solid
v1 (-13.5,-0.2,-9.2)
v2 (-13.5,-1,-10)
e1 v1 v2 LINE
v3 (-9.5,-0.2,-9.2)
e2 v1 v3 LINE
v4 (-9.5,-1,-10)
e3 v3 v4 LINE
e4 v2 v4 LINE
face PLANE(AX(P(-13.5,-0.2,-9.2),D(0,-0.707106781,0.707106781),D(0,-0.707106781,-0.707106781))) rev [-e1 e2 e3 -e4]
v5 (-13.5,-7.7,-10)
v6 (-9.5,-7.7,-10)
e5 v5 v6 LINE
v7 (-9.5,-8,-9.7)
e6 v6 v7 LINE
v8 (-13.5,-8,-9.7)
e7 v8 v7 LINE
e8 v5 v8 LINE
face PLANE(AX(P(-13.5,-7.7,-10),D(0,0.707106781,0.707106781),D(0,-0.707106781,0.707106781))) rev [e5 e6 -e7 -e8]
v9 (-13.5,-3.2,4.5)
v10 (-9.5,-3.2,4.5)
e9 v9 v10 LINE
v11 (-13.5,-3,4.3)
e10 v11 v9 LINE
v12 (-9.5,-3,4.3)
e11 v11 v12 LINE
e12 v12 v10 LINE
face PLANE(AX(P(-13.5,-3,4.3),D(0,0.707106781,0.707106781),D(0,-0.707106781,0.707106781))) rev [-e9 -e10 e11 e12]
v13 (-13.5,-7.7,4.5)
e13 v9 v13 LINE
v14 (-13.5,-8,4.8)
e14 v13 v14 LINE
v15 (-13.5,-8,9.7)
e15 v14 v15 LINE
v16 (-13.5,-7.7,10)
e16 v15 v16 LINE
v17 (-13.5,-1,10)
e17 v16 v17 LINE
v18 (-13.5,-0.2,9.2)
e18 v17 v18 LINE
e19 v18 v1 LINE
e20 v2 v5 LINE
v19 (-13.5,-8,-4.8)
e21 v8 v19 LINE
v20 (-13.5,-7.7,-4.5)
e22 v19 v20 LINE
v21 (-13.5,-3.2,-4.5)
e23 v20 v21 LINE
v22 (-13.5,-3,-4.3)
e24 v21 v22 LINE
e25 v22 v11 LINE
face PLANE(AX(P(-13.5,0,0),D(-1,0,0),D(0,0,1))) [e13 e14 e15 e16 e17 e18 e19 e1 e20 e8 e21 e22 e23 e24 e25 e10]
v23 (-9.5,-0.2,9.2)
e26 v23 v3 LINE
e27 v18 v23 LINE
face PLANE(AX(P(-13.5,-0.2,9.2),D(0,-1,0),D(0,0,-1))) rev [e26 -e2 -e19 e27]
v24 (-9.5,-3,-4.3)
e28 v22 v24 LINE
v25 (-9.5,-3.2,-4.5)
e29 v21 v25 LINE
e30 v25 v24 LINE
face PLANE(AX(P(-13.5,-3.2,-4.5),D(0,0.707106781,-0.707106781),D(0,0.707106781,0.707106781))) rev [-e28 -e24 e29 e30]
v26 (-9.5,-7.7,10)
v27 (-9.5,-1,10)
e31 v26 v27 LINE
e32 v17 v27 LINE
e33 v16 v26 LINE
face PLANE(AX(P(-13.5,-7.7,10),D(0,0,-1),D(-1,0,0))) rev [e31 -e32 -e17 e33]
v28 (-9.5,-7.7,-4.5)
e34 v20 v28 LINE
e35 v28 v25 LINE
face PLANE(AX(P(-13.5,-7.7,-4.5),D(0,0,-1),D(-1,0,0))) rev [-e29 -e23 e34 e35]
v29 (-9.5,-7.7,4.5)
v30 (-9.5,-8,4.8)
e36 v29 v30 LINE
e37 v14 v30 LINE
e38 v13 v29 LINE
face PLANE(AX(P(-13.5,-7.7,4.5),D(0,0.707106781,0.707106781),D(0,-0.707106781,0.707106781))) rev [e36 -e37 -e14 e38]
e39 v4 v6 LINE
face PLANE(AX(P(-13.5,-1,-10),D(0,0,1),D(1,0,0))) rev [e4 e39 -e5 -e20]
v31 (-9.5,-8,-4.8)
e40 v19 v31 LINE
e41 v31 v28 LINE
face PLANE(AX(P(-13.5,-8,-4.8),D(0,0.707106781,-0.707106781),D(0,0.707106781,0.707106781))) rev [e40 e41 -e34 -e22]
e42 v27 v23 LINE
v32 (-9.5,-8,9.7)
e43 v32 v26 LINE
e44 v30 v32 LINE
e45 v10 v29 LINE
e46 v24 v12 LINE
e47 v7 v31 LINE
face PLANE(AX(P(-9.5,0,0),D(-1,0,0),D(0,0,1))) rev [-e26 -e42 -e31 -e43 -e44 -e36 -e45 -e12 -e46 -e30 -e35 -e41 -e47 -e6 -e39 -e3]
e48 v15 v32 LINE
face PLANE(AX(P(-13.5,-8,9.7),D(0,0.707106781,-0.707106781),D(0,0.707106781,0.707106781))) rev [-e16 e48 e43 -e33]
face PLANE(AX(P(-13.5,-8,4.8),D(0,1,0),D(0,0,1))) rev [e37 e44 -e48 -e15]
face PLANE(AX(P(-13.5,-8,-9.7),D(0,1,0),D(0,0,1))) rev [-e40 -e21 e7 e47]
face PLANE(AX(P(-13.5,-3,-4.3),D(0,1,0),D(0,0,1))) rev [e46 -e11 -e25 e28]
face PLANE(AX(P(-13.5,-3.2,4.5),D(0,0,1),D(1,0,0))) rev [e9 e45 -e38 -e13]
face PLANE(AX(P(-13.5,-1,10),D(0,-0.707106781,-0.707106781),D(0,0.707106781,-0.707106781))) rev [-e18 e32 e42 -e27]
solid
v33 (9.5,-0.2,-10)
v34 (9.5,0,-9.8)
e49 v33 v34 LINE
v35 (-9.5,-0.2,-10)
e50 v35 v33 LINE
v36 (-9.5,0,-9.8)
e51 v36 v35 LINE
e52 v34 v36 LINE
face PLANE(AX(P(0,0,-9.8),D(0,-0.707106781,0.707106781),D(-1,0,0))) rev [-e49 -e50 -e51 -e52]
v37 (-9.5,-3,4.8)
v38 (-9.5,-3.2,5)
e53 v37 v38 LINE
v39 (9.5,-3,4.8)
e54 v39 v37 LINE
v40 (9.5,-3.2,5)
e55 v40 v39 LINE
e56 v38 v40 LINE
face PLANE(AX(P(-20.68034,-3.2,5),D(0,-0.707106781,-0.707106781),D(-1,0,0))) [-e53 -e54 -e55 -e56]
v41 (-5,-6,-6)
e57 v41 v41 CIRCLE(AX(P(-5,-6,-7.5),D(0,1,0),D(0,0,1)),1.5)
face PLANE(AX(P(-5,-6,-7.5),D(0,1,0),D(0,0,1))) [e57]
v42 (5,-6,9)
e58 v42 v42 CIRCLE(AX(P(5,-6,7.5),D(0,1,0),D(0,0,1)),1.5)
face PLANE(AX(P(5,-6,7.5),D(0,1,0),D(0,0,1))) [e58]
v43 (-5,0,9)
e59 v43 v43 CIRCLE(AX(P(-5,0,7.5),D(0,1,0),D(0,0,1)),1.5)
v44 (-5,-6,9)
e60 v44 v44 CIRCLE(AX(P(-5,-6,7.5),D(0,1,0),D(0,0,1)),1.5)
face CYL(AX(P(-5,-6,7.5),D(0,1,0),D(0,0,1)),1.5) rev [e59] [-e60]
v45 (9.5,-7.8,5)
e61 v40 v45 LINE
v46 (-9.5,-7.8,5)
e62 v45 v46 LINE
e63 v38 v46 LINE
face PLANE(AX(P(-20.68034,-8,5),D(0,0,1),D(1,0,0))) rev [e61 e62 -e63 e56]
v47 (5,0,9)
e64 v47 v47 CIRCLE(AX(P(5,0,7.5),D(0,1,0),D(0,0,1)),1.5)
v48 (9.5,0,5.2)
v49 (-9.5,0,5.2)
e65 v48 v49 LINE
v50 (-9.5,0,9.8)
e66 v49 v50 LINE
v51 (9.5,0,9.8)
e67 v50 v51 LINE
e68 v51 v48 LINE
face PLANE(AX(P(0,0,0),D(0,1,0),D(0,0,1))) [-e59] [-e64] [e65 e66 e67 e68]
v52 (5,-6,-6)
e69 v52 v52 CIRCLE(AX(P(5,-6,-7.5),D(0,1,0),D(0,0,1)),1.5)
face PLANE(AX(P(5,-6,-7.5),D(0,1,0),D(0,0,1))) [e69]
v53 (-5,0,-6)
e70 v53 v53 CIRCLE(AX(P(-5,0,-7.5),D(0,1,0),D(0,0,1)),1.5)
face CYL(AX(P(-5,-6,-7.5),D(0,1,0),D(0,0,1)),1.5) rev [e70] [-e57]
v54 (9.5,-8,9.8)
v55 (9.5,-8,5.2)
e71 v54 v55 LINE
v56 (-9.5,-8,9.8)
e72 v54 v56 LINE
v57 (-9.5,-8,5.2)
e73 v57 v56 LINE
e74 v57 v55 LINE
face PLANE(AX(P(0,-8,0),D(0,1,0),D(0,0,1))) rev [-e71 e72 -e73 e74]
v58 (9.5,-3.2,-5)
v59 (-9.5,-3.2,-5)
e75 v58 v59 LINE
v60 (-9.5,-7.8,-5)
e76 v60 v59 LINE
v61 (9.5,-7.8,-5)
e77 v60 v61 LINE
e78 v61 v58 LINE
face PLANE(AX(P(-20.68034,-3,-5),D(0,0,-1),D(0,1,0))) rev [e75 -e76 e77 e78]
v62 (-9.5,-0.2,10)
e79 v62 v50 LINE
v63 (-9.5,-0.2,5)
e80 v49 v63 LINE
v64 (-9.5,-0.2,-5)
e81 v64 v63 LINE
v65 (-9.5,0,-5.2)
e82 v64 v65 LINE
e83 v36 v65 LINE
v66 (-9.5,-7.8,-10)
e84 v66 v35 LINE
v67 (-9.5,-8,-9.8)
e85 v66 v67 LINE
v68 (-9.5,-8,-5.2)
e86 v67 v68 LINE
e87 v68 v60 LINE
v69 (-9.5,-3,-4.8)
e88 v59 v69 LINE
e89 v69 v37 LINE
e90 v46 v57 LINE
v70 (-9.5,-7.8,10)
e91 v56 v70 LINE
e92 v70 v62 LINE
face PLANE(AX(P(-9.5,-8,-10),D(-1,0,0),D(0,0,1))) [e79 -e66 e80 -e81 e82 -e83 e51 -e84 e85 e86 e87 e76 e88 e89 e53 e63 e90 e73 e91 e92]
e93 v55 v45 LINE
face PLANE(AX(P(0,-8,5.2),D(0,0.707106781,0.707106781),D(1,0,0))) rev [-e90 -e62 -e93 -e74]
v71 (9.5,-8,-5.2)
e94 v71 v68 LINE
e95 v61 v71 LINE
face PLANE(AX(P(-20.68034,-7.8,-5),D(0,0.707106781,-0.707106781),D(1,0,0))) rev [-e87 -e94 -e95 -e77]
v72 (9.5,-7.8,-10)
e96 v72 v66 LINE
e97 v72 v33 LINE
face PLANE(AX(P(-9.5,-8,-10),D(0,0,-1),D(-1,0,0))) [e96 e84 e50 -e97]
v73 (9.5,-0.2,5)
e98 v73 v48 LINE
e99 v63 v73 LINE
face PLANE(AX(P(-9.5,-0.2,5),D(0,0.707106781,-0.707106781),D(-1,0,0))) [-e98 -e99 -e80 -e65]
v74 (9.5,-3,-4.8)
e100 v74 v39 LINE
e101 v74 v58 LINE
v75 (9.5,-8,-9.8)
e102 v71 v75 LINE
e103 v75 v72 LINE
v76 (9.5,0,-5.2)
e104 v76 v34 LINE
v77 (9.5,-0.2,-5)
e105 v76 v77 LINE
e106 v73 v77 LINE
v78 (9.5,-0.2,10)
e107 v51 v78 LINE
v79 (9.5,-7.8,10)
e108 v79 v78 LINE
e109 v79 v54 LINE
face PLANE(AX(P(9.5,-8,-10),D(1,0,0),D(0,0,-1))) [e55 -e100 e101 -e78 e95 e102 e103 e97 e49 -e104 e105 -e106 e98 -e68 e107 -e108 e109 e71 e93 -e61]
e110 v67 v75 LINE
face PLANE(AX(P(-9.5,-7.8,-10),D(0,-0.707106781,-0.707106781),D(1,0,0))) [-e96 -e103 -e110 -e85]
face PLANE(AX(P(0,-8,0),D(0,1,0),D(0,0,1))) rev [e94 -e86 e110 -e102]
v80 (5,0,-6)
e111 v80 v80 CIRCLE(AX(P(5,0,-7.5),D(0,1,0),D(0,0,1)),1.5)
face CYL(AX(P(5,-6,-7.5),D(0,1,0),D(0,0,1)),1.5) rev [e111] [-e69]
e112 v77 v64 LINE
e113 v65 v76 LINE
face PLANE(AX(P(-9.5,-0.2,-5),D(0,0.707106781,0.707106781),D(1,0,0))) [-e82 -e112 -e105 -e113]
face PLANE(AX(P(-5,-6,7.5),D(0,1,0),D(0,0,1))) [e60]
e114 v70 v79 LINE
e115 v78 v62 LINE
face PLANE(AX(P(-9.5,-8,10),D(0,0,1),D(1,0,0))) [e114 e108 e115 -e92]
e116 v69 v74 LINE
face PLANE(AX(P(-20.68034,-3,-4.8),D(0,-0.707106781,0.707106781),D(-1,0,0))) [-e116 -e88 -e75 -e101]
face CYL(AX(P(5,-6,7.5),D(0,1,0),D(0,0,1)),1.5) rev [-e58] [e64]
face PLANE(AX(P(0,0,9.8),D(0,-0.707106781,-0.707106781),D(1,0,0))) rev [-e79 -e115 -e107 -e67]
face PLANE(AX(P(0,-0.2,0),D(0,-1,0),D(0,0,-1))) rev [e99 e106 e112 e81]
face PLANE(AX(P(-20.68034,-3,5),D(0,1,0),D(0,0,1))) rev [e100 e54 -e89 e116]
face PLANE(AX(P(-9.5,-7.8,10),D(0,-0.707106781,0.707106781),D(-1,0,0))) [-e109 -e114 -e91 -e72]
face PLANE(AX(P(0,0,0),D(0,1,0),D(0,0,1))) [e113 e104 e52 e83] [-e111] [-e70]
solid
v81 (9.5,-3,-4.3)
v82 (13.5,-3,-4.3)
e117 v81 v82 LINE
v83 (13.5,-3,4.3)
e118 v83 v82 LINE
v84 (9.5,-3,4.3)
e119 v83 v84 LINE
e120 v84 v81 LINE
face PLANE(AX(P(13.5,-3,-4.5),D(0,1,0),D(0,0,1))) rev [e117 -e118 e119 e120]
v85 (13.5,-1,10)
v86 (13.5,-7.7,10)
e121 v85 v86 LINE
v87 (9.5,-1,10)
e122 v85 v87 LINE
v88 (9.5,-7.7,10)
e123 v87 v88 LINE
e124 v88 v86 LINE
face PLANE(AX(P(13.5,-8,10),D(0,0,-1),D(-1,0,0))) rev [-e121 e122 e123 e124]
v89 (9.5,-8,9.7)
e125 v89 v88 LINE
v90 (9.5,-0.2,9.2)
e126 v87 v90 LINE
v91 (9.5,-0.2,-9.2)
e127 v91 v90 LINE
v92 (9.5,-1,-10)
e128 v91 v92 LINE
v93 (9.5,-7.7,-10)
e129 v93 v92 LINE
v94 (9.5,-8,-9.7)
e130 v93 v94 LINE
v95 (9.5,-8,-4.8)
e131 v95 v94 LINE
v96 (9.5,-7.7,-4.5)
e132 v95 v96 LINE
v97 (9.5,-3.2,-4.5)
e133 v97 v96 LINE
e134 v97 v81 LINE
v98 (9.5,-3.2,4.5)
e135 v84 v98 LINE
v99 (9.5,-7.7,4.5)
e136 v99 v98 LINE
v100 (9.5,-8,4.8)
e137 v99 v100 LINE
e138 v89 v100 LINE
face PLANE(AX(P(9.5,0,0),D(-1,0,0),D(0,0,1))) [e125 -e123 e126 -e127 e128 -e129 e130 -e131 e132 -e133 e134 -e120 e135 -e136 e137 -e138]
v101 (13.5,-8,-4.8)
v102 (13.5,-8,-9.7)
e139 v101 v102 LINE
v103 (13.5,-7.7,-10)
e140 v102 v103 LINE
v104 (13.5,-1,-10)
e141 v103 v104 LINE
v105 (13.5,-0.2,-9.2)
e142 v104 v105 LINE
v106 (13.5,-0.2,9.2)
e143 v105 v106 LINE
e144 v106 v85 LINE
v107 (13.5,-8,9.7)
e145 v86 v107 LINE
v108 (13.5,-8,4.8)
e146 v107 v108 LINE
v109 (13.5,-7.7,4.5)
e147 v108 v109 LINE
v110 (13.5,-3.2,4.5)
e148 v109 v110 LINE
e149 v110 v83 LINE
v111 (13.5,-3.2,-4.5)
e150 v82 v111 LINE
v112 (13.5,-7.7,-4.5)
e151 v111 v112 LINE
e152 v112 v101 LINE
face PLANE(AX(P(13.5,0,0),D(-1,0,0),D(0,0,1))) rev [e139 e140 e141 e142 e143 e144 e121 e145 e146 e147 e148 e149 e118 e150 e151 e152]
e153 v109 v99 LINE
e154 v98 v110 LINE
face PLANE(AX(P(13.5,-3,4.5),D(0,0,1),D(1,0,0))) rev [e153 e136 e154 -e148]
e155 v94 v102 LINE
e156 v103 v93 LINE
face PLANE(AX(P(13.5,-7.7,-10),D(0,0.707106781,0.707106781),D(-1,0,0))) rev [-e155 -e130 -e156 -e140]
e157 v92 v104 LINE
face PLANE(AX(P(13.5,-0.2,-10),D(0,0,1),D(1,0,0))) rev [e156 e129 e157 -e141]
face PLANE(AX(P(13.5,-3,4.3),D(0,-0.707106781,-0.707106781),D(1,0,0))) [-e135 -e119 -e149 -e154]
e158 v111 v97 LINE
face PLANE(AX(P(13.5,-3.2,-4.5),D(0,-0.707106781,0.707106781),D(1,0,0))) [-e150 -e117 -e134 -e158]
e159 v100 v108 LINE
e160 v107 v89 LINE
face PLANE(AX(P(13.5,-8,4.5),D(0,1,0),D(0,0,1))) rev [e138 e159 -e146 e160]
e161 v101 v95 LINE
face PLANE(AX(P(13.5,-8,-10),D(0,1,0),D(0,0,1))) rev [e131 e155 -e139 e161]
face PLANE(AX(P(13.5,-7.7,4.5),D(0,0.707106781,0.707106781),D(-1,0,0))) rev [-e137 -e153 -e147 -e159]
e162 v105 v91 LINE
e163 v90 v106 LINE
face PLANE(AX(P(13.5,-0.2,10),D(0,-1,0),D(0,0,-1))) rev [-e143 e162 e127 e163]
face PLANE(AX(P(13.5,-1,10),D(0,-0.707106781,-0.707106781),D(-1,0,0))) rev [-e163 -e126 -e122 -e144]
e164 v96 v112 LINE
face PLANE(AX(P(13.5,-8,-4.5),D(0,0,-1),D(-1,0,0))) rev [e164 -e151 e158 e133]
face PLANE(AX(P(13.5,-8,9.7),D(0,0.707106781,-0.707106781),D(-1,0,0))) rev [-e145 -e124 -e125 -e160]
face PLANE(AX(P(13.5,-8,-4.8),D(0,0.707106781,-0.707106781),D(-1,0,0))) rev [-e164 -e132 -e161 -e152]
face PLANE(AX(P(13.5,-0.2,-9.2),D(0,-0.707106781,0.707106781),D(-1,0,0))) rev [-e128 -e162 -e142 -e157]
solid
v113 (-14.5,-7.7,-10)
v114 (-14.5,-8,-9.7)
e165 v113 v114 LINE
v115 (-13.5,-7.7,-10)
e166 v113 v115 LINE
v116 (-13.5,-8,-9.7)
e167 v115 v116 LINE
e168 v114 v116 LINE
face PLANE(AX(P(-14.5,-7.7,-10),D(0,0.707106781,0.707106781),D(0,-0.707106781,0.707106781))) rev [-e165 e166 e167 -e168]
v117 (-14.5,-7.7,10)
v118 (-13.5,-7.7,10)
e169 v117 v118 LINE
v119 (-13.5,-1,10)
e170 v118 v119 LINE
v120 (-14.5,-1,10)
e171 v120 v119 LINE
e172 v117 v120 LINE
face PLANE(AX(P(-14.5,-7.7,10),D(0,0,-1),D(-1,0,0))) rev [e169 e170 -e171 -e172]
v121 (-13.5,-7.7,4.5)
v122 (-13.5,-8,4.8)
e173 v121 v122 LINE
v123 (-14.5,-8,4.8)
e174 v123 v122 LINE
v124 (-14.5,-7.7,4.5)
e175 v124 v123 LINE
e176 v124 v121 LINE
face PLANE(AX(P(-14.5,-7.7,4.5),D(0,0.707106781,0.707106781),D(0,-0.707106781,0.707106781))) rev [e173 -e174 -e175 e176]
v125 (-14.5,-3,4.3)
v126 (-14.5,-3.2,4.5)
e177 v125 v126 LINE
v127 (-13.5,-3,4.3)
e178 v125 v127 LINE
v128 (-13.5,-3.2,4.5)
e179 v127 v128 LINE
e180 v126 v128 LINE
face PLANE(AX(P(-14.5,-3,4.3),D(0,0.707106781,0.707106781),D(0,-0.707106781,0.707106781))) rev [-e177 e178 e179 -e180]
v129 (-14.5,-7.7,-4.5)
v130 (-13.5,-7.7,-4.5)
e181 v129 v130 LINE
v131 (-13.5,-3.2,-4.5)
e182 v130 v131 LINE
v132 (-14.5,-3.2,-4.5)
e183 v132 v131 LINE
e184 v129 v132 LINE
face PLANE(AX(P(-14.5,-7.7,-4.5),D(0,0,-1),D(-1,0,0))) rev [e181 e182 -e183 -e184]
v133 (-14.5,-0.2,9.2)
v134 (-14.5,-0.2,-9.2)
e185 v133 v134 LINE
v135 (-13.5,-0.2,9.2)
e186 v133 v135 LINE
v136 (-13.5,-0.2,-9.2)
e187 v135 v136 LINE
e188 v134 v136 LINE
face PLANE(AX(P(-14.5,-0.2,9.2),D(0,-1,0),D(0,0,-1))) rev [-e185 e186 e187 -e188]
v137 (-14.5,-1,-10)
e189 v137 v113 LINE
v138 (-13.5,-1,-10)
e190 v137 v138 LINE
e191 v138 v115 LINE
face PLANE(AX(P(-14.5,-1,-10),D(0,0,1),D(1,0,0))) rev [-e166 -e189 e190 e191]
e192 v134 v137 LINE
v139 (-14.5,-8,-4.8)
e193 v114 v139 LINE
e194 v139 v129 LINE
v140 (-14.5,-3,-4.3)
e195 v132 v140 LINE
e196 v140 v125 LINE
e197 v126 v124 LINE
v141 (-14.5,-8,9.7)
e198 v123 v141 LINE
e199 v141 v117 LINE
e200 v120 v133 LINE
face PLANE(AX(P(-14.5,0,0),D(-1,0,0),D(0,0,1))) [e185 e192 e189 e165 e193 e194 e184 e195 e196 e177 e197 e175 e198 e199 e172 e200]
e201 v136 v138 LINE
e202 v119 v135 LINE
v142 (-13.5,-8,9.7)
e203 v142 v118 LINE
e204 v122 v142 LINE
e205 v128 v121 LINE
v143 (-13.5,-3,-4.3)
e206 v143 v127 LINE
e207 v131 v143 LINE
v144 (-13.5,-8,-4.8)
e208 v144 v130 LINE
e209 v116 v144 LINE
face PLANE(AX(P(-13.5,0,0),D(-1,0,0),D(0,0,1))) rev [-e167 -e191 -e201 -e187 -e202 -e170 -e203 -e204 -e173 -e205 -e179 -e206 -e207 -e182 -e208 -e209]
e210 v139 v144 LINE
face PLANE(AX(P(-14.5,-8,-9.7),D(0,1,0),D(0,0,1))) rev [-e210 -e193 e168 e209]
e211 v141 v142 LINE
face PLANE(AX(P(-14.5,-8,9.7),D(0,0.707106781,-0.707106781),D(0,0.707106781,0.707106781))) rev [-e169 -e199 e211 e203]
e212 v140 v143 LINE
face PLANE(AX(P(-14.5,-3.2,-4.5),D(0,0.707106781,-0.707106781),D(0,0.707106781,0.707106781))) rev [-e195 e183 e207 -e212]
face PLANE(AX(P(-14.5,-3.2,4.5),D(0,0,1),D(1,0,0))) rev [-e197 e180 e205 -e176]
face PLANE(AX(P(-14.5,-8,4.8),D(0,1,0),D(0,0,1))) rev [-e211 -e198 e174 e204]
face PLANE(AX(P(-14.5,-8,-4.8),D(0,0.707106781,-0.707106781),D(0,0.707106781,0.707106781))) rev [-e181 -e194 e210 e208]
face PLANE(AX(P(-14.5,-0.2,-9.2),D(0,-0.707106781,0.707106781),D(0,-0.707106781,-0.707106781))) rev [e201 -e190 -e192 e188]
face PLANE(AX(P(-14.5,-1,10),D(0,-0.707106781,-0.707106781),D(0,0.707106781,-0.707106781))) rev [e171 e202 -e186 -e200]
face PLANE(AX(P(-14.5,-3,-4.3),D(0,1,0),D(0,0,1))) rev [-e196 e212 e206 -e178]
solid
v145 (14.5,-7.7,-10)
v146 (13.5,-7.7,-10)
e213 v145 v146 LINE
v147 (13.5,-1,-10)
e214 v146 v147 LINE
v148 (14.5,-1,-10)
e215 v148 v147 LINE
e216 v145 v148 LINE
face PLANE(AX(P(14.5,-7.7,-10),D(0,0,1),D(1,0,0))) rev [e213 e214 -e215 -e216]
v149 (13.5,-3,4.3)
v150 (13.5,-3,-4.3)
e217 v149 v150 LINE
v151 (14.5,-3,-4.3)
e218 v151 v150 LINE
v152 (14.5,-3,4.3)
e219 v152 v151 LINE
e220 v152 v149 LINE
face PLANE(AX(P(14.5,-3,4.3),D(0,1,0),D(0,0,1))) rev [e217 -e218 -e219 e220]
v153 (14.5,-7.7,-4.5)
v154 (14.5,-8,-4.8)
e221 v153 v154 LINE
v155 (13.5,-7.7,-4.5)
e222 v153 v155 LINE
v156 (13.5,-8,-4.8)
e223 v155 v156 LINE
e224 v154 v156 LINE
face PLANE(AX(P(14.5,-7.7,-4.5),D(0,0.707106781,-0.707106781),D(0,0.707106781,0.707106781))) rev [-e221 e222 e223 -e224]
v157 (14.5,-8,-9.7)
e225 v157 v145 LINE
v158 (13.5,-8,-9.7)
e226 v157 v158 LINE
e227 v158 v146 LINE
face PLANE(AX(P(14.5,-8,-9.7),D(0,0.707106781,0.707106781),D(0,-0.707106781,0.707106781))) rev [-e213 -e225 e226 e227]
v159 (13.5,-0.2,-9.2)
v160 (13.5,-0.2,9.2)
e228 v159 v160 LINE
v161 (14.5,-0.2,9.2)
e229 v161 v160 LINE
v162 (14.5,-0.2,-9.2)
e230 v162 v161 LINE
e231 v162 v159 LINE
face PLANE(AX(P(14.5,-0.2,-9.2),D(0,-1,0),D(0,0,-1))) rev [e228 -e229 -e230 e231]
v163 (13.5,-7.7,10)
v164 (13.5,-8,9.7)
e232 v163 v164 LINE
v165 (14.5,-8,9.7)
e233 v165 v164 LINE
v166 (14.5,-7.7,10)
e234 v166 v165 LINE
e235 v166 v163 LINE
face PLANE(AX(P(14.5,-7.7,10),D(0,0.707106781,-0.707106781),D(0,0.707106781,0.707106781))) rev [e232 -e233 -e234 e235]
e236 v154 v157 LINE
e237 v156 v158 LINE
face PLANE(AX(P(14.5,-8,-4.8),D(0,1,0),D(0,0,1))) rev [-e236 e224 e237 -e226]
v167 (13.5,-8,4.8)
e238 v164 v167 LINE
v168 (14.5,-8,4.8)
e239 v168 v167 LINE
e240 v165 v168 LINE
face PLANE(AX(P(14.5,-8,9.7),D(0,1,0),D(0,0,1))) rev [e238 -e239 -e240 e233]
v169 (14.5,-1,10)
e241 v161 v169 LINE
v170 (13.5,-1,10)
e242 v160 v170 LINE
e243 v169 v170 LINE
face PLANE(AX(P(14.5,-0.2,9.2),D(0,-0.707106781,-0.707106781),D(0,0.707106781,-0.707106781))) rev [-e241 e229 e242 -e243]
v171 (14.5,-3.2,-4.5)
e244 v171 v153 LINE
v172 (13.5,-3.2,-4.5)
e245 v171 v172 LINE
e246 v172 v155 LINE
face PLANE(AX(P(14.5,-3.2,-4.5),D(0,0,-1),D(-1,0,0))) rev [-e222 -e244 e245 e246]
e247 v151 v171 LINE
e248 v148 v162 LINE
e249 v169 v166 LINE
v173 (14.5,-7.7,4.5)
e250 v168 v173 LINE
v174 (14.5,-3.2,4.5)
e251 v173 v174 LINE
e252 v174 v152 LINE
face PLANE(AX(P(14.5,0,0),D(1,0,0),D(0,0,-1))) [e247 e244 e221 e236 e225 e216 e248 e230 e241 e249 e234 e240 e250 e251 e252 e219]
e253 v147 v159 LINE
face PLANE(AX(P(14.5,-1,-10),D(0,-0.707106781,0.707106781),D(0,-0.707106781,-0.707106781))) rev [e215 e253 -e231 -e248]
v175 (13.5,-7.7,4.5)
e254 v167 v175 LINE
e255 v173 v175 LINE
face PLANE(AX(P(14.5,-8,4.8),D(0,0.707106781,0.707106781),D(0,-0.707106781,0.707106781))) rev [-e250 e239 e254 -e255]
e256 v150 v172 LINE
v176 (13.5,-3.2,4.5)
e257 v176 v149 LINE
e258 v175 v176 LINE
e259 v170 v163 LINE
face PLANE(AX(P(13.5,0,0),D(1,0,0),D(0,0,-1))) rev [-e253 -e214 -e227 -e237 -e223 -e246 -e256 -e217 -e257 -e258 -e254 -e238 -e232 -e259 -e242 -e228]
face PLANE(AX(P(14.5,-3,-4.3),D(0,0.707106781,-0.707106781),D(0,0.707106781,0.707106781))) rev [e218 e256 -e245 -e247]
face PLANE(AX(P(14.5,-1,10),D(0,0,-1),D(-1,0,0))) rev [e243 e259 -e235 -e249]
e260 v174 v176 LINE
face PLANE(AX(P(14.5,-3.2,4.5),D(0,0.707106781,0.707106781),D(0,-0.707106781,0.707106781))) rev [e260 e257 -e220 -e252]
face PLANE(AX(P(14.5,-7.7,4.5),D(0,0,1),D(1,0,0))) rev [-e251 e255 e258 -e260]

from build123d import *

# Parameters (mm, degrees)
SKETCH_1_W          = 19
SKETCH_1_H          = 20
EXTRUDE_1_DEPTH     = 8
SKETCH_2_W          = 19
SKETCH_2_H          = 10
CUT_EXTRUDE_1_DEPTH = 0.2
CHAMFER_1_SIZE      = 0.2
SKETCH_3_R          = 1.5
CUT_EXTRUDE_2_DEPTH = 6
SKETCH_4_W          = 10
SKETCH_4_H          = 5
CUT_EXTRUDE_3_DEPTH = 19
CHAMFER_2_SIZE      = 0.2
EXTRUDE_2_DEPTH     = 4
CHAMFER_3_SIZE      = 0.2
CHAMFER_4_SIZE      = 0.3
CHAMFER_5_SIZE      = 0.8
EXTRUDE_3_DEPTH     = 4
EXTRUDE_4_DEPTH     = 1
EXTRUDE_5_DEPTH     = 1


with BuildPart() as part:
    # 草图1 → 凸台-拉伸1 (new body)
    with BuildSketch(Plane(origin=(0, 0, 0), x_dir=(1, 0, 0), z_dir=(0, 1, 0))):
        Rectangle(SKETCH_1_W, SKETCH_1_H)
    extrude(amount=-EXTRUDE_1_DEPTH)

    # 草图2 → 切除-拉伸1 (cut)
    with BuildSketch(Plane(origin=(0, 0, 0), x_dir=(1, 0, 0), z_dir=(0, 1, 0))):
        Rectangle(SKETCH_2_W, SKETCH_2_H)
    extrude(amount=-CUT_EXTRUDE_1_DEPTH, mode=Mode.SUBTRACT)

    # 倒角1
    chamfer_1_edges = [part.edges().sort_by_distance(p)[0] for p in [
        (0, -8, 10),
        (0, -8, -10),
        (0, 0, -10),
        (0, 0, 10),
        (0, 0, 5),
        (0, 0, -5),
    ]]
    chamfer(chamfer_1_edges, length=CHAMFER_1_SIZE - 0.0001)  # a hair under: the kernel refuses the full size

    # 草图3 → 切除-拉伸2 (cut)
    with BuildSketch(Plane(origin=(0, 0, 0), x_dir=(1, 0, 0), z_dir=(0, 1, 0))):
        with Locations(Location((-5, 7.5, 0), (0, 0, 270))):
            Circle(SKETCH_3_R)
        with Locations(Location((5, 7.5, 0), (0, 0, 270))):
            Circle(SKETCH_3_R)
        with Locations(Location((5, -7.5, 0), (0, 0, 270))):
            Circle(SKETCH_3_R)
        with Locations(Location((-5, -7.5, 0), (0, 0, 270))):
            Circle(SKETCH_3_R)
    extrude(amount=-CUT_EXTRUDE_2_DEPTH, mode=Mode.SUBTRACT)

    # 草图4 → 切除-拉伸3 (cut)
    with BuildSketch(Plane(origin=(9.5, 0, 0), x_dir=(0, 0, -1), z_dir=(1, 0, 0))):
        with Locations((0, -5.5)):
            Rectangle(SKETCH_4_W, SKETCH_4_H)
    extrude(amount=-CUT_EXTRUDE_3_DEPTH, mode=Mode.SUBTRACT)

    # 倒角2
    chamfer_2_edges = [part.edges().sort_by_distance(p)[0] for p in [
        (0, -3, -5),
        (0, -3, 5),
        (0, -8, 5),
        (0, -8, -5),
    ]]
    chamfer(chamfer_2_edges, length=CHAMFER_2_SIZE)


with BuildPart() as body_2:
    # 草图5 → 凸台-拉伸2 (new body)
    with BuildSketch(Plane(origin=(9.5, 0, 0), x_dir=(0, 0, -1), z_dir=(1, 0, 0))):
        Polygon((-10, -0.2), (10, -0.2), (10, -8), (4.5, -8), (4.5, -3), (-4.5, -3), (-4.5, -8), (-10, -8), align=None)
    extrude(amount=EXTRUDE_2_DEPTH)

    # 倒角3
    chamfer_3_edges = [body_2.edges().sort_by_distance(p)[0] for p in [
        (11.5, -3, -4.5),
        (11.5, -3, 4.5),
    ]]
    chamfer(chamfer_3_edges, length=CHAMFER_3_SIZE)

    # 倒角4
    chamfer_4_edges = [body_2.edges().sort_by_distance(p)[0] for p in [
        (11.5, -8, -10),
        (11.5, -8, -4.5),
        (11.5, -8, 4.5),
        (11.5, -8, 10),
    ]]
    chamfer(chamfer_4_edges, length=CHAMFER_4_SIZE)

    # 倒角5
    chamfer_5_edges = [body_2.edges().sort_by_distance(p)[0] for p in [
        (11.5, -0.2, 10),
        (11.5, -0.2, -10),
    ]]
    chamfer(chamfer_5_edges, length=CHAMFER_5_SIZE)


with BuildPart() as body_3:
    # 草图6 → 凸台-拉伸3 (new body)
    with BuildSketch(Plane.ZY.offset(9.5)):
        Polygon((9.2, -0.2), (-9.2, -0.2), (-10, -1), (-10, -7.7), (-9.7, -8), (-4.8, -8), (-4.5, -7.7), (-4.5, -3.2), (-4.3, -3), (4.3, -3), (4.5, -3.2), (4.5, -7.7), (4.8, -8), (9.7, -8), (10, -7.7), (10, -1), align=None)
    extrude(amount=EXTRUDE_3_DEPTH)


with BuildPart() as body_4:
    # 草图7 → 凸台-拉伸4 (new body)
    with BuildSketch(Plane.ZY.offset(13.5)):
        Polygon((-9.2, -0.2), (-10, -1), (-10, -7.7), (-9.7, -8), (-4.8, -8), (-4.5, -7.7), (-4.5, -3.2), (-4.3, -3), (4.3, -3), (4.5, -3.2), (4.5, -7.7), (4.8, -8), (9.7, -8), (10, -7.7), (10, -1), (9.2, -0.2), align=None)
    extrude(amount=EXTRUDE_4_DEPTH)


with BuildPart() as body_5:
    # 草图8 → 凸台-拉伸5 (new body)
    with BuildSketch(Plane(origin=(13.5, 0, 0), x_dir=(0, 0, -1), z_dir=(1, 0, 0))):
        Polygon((9.2, -0.2), (-9.2, -0.2), (-10, -1), (-10, -7.7), (-9.7, -8), (-4.8, -8), (-4.5, -7.7), (-4.5, -3.2), (-4.3, -3), (4.3, -3), (4.5, -3.2), (4.5, -7.7), (4.8, -8), (9.7, -8), (10, -7.7), (10, -1), align=None)
    extrude(amount=EXTRUDE_5_DEPTH)


solid = Compound([part.part, body_2.part, body_3.part, body_4.part, body_5.part])
